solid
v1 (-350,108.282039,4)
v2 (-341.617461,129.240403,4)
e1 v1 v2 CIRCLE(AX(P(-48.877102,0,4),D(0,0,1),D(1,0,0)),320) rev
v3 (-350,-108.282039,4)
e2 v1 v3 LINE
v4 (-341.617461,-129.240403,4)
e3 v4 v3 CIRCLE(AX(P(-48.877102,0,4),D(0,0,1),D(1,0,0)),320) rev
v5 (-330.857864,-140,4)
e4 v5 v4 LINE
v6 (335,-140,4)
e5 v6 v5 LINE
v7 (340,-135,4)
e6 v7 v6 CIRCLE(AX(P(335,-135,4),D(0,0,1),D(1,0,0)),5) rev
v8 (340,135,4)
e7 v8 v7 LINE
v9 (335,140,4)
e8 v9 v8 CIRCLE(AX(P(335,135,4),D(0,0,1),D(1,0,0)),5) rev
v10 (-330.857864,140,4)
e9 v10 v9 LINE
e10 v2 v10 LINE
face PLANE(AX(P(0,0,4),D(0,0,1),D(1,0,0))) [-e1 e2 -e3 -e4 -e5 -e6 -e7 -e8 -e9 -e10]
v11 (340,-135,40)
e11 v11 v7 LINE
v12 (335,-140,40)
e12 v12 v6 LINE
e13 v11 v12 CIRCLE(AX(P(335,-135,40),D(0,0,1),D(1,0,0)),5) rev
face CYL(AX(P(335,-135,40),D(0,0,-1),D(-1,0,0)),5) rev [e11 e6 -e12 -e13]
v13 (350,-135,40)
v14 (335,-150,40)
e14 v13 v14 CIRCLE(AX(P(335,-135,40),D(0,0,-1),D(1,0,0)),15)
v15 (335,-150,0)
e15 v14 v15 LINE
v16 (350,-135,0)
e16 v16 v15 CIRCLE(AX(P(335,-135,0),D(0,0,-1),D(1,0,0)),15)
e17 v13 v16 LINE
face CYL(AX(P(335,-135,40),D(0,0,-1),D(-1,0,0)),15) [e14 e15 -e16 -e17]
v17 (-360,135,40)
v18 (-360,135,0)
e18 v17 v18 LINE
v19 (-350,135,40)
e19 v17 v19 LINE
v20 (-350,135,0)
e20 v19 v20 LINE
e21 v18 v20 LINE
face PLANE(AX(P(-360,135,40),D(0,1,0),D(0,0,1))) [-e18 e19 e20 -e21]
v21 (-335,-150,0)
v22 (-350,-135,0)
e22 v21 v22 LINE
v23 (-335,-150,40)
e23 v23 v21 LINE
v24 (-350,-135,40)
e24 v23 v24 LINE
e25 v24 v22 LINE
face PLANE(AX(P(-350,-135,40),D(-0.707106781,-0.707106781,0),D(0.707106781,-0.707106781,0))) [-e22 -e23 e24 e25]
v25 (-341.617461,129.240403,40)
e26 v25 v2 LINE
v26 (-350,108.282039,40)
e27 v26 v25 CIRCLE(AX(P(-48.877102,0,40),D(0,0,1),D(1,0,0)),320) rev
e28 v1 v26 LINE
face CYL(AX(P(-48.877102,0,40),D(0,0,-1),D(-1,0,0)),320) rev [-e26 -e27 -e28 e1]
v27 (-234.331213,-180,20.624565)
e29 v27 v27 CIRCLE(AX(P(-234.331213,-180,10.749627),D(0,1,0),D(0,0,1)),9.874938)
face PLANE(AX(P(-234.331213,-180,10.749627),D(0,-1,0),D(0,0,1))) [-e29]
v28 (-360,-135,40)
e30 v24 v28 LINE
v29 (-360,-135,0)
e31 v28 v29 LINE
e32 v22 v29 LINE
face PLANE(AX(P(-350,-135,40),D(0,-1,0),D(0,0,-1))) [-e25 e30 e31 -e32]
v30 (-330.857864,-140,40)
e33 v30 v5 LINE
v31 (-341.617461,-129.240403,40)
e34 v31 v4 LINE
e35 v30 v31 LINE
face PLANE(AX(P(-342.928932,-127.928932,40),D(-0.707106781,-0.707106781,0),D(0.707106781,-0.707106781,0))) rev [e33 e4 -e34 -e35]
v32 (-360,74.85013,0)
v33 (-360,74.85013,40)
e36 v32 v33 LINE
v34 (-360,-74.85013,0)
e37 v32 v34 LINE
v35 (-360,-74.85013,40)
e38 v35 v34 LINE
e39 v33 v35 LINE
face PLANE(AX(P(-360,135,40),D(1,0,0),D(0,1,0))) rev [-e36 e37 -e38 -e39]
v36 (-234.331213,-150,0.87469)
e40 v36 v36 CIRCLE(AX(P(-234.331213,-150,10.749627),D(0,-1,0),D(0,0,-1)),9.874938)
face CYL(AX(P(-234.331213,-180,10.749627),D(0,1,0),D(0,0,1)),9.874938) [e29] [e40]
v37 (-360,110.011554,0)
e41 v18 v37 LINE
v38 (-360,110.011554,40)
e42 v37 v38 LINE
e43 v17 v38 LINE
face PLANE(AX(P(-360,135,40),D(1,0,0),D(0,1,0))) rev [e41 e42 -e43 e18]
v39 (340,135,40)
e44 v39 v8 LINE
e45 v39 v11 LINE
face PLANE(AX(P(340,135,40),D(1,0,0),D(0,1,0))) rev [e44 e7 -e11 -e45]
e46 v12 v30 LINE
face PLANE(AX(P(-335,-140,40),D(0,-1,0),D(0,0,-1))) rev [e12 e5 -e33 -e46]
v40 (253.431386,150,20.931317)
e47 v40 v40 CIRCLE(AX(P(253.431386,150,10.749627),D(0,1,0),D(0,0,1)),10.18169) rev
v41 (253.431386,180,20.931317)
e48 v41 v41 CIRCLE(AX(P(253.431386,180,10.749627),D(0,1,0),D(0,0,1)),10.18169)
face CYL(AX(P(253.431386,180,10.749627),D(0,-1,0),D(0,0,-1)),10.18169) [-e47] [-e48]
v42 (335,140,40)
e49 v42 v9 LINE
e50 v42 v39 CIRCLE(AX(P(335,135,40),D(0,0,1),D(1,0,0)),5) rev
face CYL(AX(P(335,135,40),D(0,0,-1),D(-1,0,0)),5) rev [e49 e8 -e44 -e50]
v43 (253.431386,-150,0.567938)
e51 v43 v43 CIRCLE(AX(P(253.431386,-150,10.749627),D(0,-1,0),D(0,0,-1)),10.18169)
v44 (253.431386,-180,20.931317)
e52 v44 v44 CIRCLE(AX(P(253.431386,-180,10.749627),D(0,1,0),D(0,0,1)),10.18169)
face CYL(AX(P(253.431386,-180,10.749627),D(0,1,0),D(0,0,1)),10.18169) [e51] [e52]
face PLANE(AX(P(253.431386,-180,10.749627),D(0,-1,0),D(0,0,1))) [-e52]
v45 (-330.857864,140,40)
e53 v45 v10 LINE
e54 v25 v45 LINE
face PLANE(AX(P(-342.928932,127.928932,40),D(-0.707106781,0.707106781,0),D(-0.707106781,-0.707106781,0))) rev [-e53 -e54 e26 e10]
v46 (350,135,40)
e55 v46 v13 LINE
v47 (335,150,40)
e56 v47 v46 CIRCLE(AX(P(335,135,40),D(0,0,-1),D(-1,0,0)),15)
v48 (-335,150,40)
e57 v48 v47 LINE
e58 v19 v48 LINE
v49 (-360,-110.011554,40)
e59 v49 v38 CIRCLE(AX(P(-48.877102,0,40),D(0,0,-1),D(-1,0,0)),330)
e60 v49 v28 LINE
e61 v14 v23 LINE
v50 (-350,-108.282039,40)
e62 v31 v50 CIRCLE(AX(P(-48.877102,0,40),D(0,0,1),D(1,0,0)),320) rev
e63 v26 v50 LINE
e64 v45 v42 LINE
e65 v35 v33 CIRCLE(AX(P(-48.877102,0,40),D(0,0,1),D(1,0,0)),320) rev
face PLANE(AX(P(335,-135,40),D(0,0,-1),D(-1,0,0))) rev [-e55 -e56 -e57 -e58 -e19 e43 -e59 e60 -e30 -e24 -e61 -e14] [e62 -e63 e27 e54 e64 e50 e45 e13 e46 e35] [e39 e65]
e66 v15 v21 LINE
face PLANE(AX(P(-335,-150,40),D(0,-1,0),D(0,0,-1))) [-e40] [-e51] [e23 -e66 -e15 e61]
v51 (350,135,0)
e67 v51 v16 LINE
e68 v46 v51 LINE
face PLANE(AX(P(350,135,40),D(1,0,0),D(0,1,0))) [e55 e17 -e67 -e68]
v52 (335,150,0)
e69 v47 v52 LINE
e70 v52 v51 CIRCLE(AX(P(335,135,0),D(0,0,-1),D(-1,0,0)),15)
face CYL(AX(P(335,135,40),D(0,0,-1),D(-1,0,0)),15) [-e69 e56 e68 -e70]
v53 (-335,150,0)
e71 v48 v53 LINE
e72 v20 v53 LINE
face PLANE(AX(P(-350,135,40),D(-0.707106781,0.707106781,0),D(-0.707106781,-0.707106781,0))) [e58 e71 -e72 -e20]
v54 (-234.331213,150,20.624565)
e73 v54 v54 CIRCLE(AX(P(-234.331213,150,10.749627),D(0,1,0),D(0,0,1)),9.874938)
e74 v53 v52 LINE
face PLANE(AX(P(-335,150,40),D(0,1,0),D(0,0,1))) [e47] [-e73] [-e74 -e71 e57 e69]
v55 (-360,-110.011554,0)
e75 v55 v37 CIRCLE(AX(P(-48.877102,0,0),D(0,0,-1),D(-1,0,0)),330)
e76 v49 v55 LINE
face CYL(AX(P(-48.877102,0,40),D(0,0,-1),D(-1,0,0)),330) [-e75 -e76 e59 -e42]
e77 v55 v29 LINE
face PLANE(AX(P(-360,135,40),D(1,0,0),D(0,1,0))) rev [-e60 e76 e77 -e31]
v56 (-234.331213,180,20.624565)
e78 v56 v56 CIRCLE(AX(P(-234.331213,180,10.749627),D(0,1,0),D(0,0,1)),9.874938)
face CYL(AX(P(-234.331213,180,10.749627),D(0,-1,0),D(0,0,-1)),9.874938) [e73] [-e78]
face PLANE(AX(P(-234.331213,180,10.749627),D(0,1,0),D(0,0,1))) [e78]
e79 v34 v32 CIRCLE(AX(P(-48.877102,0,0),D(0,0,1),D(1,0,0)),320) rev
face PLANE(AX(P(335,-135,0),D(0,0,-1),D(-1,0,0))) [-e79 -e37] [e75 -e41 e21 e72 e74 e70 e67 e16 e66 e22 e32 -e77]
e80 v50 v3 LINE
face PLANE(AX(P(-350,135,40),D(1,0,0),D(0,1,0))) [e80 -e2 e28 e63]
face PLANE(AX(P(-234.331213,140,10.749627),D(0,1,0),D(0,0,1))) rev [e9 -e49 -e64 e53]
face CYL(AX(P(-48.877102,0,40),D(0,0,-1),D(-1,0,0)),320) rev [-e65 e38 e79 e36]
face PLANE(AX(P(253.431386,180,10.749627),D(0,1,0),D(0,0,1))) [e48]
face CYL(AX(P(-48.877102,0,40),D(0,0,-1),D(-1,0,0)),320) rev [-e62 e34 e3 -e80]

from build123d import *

# Parameters (mm, degrees)
SKETCH_2_R        = 9.874937623
EXTRUDE_1_DEPTH   = 40
SKETCH_2_R_2      = 10.181689967
EXTRUDE_1_2_DEPTH = 40
EXTRUDE_1_3_DEPTH = 40
EXTRUDE_5_DEPTH   = 40
EXTRUDE_2_DEPTH   = 4


# Read off the part's stored shape, not the designer's step: 拉伸-薄壁1
with BuildPart() as part:
    # 草图2 → Extrude 1 (new body)
    with BuildSketch(Plane(origin=(0, 140, 0), x_dir=(1, 0, 0), z_dir=(0, 1, 0))):
        with Locations(Location((-234.331213423, -10.749627478, 0), (0, 0, 270))):
            Circle(SKETCH_2_R)
    extrude_1 = extrude(amount=EXTRUDE_1_DEPTH)



with BuildPart() as body_2:
    # 草图2 → Extrude 1 2 (new body)
    with BuildSketch(Plane(origin=(0, 140, 0), x_dir=(1, 0, 0), z_dir=(0, 1, 0))):
        with Locations(Location((253.431386216, -10.749627478, 0), (0, 0, 270))):
            Circle(SKETCH_2_R_2)
    extrude_1_2 = extrude(amount=EXTRUDE_1_2_DEPTH)


with BuildPart() as part_1:
    add(part.part)

    add(body_2.part)  # Extrude 1 3 merges body 2
    # Extrude 1 3 outline → Extrude 1 3 (add)
    with BuildSketch(Plane.XY):
        with BuildLine():
            Line((-360, -135), (-350, -135))
            Line((-350, -135), (-335, -150))
            Line((-335, -150), (335, -150))
            ThreePointArc((335, -150), (345.606601718, -145.606601718), (350, -135))
            Line((350, -135), (350, 135))
            ThreePointArc((350, 135), (345.606601718, 145.606601718), (335, 150))
            Line((335, 150), (-335, 150))
            Line((-335, 150), (-335, 140))
            Line((-335, 140), (335, 140))
            ThreePointArc((335, 140), (338.535533906, 138.535533906), (340, 135))
            Line((340, 135), (340, -135))
            ThreePointArc((340, -135), (338.535533906, -138.535533906), (335, -140))
            Line((335, -140), (-330.857864376, -140))
            Line((-330.857864376, -140), (-341.617461171, -129.240403205))
            ThreePointArc((-341.617461171, -129.240403205), (-345.993586414, -118.835156387), (-350, -108.282039139))
            Line((-350, -108.282039139), (-350, 108.282039139))
            ThreePointArc((-350, 108.282039139), (-345.653254032, 119.682560505), (-340.875063682, 130.909090909))
            Line((-340.875063682, 130.909090909), (-350, 135))
            Line((-350, 135), (-360, 135))
            Line((-360, 135), (-360, 110.011554075))
            ThreePointArc((-360, 110.011554075), (-378.877101502, 0), (-360, -110.011554075))
            Line((-360, -110.011554075), (-360, -135))
        make_face()
        with BuildLine():
            Line((-360, 74.850130461), (-360, -74.850130461))
            ThreePointArc((-360, -74.850130461), (-368.877101502, 0), (-360, 74.850130461))
        make_face(mode=Mode.SUBTRACT)
    extrude(amount=EXTRUDE_1_3_DEPTH)

    # 镜向3: Extrude 1, Extrude 1 2 across plane
    add(extrude_1.mirror(Plane.ZX))
    add(extrude_1_2.mirror(Plane.ZX))

    # 草图1<3> → 拉伸-薄壁5 (add)
    with BuildSketch(Plane.XY):
        Polygon((-350, 135), (-335, 150), (-327.928932188, 142.928932188), (-342.928932188, 127.928932188), align=None)
    extrude(amount=EXTRUDE_5_DEPTH)

    # 草图1<4> → 凸台-拉伸2 (add)
    with BuildSketch(Plane.XY):
        with BuildLine():
            Line((-335, -150), (335, -150))
            ThreePointArc((335, -150), (345.606601718, -145.606601718), (350, -135))
            Line((350, -135), (350, 135))
            ThreePointArc((350, 135), (345.606601718, 145.606601718), (335, 150))
            Line((335, 150), (-335, 150))
            Line((-335, 150), (-350, 135))
            Line((-350, 135), (-350, -135))
            Line((-350, -135), (-335, -150))
        make_face()
    extrude(amount=EXTRUDE_2_DEPTH)


solid = part_1.part
